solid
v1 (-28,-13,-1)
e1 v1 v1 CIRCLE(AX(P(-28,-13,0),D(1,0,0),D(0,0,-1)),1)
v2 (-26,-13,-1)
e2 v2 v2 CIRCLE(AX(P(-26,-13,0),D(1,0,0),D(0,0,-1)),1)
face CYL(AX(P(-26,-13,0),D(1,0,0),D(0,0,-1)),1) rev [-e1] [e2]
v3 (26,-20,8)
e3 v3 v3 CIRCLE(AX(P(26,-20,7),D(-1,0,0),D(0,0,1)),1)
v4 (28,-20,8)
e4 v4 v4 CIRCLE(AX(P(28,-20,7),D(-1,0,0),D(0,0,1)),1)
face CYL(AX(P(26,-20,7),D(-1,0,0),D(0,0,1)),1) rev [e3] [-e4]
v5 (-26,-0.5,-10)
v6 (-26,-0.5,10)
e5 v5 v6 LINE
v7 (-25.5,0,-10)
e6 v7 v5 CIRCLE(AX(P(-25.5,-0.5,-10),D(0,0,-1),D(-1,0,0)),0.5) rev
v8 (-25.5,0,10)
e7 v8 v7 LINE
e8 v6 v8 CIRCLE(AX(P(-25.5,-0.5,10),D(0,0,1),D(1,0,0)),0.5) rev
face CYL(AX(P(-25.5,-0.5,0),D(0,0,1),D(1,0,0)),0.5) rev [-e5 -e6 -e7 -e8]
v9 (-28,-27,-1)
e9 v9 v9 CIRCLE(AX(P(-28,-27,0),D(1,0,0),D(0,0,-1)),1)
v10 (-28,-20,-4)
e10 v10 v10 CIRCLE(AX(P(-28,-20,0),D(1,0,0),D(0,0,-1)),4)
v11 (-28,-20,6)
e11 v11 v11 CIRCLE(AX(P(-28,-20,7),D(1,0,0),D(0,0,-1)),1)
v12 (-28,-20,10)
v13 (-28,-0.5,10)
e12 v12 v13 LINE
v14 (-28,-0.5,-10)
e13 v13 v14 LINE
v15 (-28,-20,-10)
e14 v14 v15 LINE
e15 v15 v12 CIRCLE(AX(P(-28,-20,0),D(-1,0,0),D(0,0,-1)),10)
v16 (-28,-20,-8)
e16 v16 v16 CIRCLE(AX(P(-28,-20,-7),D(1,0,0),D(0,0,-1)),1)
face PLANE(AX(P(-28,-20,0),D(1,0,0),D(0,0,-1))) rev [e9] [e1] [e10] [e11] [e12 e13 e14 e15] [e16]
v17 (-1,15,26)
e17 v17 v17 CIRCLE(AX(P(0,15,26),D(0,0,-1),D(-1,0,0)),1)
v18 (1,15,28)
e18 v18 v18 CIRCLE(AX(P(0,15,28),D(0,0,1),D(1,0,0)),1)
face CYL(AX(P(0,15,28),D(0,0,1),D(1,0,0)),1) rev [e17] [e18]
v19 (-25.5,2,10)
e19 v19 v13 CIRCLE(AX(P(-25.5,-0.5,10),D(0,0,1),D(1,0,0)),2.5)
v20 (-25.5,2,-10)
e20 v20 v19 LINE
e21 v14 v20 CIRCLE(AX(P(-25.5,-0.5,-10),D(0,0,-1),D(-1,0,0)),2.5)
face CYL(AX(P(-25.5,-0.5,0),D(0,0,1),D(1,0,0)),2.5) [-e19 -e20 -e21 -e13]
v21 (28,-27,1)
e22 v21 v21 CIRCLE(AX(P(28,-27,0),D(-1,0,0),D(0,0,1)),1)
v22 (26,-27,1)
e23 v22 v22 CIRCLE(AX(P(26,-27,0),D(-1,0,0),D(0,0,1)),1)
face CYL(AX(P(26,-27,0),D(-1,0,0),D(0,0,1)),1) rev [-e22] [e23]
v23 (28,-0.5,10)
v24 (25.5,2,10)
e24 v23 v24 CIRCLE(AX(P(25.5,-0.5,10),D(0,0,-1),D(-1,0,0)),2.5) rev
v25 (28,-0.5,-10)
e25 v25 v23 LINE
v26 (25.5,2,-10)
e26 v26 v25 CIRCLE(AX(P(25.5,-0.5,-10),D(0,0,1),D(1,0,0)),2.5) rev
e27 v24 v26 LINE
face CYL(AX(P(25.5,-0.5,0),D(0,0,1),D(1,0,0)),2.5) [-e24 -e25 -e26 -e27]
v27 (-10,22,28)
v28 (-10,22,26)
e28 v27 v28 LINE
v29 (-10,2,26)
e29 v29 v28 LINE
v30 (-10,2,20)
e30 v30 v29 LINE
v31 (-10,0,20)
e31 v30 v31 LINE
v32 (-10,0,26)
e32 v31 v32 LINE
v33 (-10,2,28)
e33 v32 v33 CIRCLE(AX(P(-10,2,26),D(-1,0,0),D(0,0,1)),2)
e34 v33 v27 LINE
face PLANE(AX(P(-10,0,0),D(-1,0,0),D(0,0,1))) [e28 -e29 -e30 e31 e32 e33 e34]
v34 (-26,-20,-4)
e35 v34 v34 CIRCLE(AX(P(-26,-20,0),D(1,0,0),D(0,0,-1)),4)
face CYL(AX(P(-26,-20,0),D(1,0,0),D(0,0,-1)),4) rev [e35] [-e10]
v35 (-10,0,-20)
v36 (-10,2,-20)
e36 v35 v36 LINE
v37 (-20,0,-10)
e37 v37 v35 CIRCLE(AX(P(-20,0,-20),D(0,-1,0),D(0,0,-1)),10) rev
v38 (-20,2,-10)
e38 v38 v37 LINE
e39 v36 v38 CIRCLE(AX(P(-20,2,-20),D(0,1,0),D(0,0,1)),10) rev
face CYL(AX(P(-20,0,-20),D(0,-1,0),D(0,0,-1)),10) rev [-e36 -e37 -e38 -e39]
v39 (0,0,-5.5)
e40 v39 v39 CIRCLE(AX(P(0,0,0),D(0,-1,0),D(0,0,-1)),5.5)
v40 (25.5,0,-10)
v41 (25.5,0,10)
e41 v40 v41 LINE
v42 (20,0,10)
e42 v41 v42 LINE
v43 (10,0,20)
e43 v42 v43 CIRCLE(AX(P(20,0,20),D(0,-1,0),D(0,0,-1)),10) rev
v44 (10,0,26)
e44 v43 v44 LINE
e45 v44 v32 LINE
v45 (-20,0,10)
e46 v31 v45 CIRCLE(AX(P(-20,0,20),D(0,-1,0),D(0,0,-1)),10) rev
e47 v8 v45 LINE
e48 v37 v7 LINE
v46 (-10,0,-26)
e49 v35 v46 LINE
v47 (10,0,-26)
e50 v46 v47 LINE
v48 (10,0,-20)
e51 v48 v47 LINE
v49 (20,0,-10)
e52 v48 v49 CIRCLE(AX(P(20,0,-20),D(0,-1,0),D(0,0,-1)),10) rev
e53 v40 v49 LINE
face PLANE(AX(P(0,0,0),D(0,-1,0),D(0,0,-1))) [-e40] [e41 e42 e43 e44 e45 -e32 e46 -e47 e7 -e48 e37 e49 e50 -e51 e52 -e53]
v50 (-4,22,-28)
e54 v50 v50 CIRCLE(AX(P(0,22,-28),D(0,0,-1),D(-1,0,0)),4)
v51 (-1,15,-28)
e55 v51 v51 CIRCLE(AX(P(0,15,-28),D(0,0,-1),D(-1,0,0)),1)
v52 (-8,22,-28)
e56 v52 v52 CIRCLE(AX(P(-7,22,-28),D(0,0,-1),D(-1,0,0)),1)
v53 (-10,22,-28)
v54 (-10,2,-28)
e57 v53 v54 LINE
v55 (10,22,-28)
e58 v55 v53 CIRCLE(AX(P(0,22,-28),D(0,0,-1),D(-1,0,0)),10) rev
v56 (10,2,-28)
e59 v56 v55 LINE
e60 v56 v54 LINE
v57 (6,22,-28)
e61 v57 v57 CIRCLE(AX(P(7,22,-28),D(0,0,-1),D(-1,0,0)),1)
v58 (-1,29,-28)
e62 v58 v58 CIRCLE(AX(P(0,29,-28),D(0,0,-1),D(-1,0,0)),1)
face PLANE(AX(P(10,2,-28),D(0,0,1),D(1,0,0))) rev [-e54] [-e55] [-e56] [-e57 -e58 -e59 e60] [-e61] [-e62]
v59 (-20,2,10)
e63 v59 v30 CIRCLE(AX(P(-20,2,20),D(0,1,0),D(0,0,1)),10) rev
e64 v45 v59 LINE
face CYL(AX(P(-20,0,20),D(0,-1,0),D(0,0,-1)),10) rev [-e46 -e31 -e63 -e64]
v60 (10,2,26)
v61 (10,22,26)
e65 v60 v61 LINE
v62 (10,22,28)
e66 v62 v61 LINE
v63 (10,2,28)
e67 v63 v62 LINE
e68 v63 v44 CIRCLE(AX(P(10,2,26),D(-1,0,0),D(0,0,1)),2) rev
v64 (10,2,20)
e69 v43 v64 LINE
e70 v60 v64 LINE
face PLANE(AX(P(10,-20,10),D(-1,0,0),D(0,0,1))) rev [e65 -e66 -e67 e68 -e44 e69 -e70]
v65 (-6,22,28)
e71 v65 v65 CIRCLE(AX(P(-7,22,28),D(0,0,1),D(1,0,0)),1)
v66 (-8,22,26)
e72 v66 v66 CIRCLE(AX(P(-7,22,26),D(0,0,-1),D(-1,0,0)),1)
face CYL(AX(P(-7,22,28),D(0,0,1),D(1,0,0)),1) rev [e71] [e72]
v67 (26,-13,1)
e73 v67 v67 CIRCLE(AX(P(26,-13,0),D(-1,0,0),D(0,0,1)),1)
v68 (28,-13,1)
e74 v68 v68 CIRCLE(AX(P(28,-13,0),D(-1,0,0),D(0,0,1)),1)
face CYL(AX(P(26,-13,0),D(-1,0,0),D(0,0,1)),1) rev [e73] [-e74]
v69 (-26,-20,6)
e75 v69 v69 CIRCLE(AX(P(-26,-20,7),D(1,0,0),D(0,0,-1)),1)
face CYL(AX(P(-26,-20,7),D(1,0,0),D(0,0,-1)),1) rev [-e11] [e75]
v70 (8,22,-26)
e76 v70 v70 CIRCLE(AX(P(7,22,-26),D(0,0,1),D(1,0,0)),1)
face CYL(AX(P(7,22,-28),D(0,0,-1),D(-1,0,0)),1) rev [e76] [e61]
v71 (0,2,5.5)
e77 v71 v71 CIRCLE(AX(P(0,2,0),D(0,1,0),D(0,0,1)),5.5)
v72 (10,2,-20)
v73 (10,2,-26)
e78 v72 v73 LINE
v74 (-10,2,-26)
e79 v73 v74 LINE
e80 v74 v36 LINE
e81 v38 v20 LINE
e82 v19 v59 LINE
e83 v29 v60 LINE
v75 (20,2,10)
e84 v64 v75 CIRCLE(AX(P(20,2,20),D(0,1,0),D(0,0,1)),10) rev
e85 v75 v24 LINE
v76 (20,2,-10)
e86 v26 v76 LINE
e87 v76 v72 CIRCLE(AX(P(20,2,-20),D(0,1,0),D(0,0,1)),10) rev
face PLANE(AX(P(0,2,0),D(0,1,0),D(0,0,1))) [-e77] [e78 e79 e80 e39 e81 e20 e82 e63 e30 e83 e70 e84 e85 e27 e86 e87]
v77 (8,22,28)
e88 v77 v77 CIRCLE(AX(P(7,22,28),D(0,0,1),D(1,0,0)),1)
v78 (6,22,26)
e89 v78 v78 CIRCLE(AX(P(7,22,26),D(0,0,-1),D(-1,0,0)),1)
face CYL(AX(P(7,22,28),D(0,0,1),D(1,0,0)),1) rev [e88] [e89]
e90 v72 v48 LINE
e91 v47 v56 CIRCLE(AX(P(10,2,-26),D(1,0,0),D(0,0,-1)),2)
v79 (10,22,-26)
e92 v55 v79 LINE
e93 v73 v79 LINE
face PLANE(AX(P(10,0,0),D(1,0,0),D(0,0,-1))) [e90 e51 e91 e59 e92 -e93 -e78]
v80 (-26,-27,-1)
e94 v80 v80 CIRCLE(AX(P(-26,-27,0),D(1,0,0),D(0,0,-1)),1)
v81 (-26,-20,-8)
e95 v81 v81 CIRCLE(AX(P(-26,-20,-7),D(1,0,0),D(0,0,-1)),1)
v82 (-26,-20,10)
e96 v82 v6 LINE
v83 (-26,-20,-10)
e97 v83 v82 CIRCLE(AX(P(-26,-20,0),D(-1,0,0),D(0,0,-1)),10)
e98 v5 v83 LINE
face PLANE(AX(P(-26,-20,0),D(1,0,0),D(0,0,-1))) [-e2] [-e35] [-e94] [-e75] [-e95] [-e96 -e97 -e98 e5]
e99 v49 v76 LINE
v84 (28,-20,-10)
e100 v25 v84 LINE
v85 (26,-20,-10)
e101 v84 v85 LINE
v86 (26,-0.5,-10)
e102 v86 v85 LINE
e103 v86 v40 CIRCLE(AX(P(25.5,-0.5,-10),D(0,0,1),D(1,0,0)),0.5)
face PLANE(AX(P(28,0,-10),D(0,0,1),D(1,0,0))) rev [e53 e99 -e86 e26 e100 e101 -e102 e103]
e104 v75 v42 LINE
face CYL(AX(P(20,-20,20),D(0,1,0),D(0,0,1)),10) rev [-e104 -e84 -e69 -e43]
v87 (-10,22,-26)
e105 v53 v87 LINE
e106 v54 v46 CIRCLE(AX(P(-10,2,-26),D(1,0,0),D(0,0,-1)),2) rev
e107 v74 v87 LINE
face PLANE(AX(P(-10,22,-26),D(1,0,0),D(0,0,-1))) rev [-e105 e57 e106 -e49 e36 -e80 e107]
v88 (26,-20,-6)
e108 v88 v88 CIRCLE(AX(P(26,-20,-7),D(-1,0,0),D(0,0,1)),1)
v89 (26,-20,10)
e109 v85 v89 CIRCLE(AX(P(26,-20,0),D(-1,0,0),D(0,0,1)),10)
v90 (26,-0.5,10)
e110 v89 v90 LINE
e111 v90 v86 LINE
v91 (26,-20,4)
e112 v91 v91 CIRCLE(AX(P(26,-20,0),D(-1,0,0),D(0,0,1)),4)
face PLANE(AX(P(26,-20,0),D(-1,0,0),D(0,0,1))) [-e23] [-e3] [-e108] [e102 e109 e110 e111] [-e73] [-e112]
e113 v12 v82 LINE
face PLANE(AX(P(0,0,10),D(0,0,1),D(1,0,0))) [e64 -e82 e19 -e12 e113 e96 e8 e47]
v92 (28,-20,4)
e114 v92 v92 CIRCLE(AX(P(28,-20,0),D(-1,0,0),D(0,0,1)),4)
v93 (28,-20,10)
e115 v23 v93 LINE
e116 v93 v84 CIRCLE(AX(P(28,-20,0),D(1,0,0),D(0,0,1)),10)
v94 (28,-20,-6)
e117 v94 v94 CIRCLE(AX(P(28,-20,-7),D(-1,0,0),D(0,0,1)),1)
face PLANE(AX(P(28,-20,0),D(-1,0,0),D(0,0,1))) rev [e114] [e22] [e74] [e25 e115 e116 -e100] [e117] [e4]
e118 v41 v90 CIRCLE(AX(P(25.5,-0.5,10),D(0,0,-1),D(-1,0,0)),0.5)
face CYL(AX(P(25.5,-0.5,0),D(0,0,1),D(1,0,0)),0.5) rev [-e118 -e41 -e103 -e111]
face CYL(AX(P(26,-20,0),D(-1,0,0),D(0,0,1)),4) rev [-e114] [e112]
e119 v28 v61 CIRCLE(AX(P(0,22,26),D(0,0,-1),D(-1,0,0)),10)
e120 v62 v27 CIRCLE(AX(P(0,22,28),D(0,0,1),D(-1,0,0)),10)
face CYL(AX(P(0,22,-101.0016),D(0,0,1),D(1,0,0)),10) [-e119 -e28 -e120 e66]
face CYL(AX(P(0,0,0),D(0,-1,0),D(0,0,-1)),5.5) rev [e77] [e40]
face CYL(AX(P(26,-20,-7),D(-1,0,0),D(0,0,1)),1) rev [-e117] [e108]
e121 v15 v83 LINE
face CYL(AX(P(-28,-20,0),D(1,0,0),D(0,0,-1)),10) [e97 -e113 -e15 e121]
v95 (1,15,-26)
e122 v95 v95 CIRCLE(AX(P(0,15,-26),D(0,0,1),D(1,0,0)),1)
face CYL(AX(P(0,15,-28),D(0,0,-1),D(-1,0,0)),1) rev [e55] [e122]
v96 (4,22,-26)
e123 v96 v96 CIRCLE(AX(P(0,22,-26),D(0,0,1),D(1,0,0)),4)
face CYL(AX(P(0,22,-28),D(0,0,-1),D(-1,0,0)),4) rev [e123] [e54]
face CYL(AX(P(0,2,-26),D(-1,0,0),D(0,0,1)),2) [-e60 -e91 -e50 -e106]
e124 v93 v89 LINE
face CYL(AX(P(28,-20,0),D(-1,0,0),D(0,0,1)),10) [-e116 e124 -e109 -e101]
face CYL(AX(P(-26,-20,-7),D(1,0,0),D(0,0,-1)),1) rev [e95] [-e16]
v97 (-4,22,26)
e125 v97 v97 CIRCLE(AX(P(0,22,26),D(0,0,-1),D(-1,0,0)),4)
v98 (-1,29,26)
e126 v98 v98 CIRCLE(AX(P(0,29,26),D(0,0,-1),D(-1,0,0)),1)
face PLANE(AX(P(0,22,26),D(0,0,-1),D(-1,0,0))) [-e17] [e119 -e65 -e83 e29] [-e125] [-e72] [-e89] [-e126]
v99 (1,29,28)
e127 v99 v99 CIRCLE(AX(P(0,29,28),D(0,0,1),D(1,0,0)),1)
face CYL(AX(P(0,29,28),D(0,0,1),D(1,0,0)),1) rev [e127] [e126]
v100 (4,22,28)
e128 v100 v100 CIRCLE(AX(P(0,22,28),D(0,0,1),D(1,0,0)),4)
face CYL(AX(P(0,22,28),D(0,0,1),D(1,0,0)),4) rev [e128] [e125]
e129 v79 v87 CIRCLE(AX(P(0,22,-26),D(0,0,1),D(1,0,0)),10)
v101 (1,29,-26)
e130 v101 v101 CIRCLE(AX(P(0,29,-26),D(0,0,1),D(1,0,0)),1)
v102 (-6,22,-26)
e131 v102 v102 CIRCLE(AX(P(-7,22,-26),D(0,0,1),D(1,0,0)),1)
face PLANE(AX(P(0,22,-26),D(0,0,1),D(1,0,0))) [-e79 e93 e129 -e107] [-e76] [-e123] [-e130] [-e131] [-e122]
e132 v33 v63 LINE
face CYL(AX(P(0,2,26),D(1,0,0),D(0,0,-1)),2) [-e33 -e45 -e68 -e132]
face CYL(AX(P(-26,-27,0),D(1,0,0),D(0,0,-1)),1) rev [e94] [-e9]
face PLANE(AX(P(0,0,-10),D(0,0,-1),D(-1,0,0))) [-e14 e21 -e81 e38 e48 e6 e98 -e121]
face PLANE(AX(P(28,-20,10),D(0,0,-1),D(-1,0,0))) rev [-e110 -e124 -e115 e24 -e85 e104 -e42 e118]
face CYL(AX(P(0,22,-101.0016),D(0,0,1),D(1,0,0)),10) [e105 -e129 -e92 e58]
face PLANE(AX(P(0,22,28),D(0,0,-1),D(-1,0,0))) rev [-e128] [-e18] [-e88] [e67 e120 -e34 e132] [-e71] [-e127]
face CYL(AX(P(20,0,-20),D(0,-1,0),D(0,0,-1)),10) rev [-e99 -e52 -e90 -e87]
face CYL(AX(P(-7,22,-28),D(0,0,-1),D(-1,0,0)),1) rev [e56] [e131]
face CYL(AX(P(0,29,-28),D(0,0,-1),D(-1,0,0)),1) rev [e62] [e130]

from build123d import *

# Parameters (mm, degrees)
EXTRUDE_START               = -28
EXTRUDE_1_DEPTH             = 38
EXTRUDE_2_DEPTH             = 16
EXTRUDE_3_DEPTH             = 18
EXTRUDE_4_DEPTH             = 2
CUT_EXTRUDE_1_DEPTH         = 20
SKETCH_6_W                  = 16
SKETCH_6_H                  = 22
CUT_EXTRUDE_2_DEPTH         = 2
SKETCH_7_W                  = 2
SKETCH_7_H                  = 22
CUT_EXTRUDE_3_DEPTH         = 16
SKETCH_8_W                  = 16
SKETCH_8_H                  = 22
CUT_EXTRUDE_4_DEPTH         = 16
CUT_EXTRUDE_5_DEPTH         = 18
CUT_EXTRUDE_6_DEPTH         = 16
SKETCH_11_W                 = 16
SKETCH_11_H                 = 22
CUT_EXTRUDE_7_DEPTH         = 16
CUT_EXTRUDE_8_DEPTH         = 20
CUT_EXTRUDE_START           = -16
CUT_EXTRUDE_9_DEPTH         = 16
CUT_EXTRUDE_10_DEPTH        = 16
CUT_EXTRUDE_11_DEPTH        = 20
EXTRUDE_START_2             = 2
EXTRUDE_5_DEPTH             = 2
HOLE_WIZARD_11_0_11_1_D     = 11
HOLE_WIZARD_11_0_11_1_DEPTH = 32
HOLE_WIZARD_8_0_8_1_D       = 8
HOLE_WIZARD_8_0_8_1_DEPTH   = 2
HOLE_WIZARD_2_0_2_1_D       = 2
HOLE_WIZARD_2_0_2_1_DEPTH   = 2
HOLE_WIZARD_8_0_8_2_D       = 8
HOLE_WIZARD_8_0_8_2_DEPTH   = 56
HOLE_WIZARD_2_0_2_2_D       = 2
HOLE_WIZARD_2_0_2_2_DEPTH   = 56
HOLE_WIZARD_8_0_8_3_D       = 8
HOLE_WIZARD_8_0_8_3_DEPTH   = 2
HOLE_WIZARD_2_0_2_3_D       = 2
HOLE_WIZARD_2_0_2_3_DEPTH   = 2
HOLE_WIZARD_8_0_8_4_D       = 8
HOLE_WIZARD_2_0_2_4_D       = 2
FILLET_1_R                  = 0.5
FILLET_2_R                  = 2
FILLET_3_R                  = 2.5
FILLET_4_R                  = 10


with BuildPart() as part:
    # 凸台-拉伸1: read off the stored shape, not the designer's step
    # 凸台-拉伸1 outline → 凸台-拉伸1 (new body)
    with BuildSketch(Plane.XY.offset(EXTRUDE_START)):
        with BuildLine():
            Line((10, -20), (10, 22))
            ThreePointArc((10, 22), (0, 32), (-10, 22))
            Line((-10, 22), (-26, 22))
            Line((-26, 22), (-26, -20))
            Line((-26, -20), (10, -20))
        make_face()
    extrude(amount=EXTRUDE_1_DEPTH)

    # 草图2 → 凸台-拉伸2 (add)
    with BuildSketch(Plane.XY.offset(10)):
        with BuildLine():
            Line((10, 22), (10, -20))
            Line((10, -20), (-26, -20))
            Line((-26, -20), (-26, 22))
            Line((-26, 22), (-10, 22))
            ThreePointArc((-10, 22), (0, 32), (10, 22))
        make_face()
    extrude(amount=EXTRUDE_2_DEPTH)

    # 草图3 → 凸台-拉伸3 (add)
    with BuildSketch(Plane(origin=(10, 0, 0), x_dir=(0, 0, -1), z_dir=(1, 0, 0))):
        with BuildLine():
            Line((-10, -20), (-10, 22))
            Line((-10, 22), (10, 22))
            Line((10, 22), (26, 22))
            Line((26, 22), (28, 22))
            Line((28, 22), (28, -20))
            Line((28, -20), (10, -20))
            ThreePointArc((10, -20), (0, -30), (-10, -20))
        make_face()
    extrude(amount=EXTRUDE_3_DEPTH)

    # 草图4 → 凸台-拉伸4 (add)
    with BuildSketch(Plane.XY.offset(26)):
        with BuildLine():
            Line((10, 22), (10, -20))
            Line((10, -20), (-26, -20))
            Line((-26, -20), (-26, 22))
            Line((-26, 22), (-10, 22))
            ThreePointArc((-10, 22), (0, 32), (10, 22))
        make_face()
    extrude(amount=EXTRUDE_4_DEPTH)

    # 草图5 → 切除-拉伸1 (cut)
    with BuildSketch(Plane.XZ.offset(20)):
        Polygon((-26, 28), (-26, -28), (28, -28), (28, -10), (10, -10), (10, 10), (10, 28), align=None)
    extrude(amount=-CUT_EXTRUDE_1_DEPTH, mode=Mode.SUBTRACT)

    # 草图6 → 切除-拉伸2 (cut)
    with BuildSketch(Plane(origin=(0, 0, -28), x_dir=(-1, 0, 0), z_dir=(0, 0, -1))):
        with Locations((18, 11)):
            Rectangle(SKETCH_6_W, SKETCH_6_H)
    extrude(amount=-CUT_EXTRUDE_2_DEPTH, mode=Mode.SUBTRACT)

    # 草图7 → 切除-拉伸3 (cut)
    with BuildSketch(Plane.ZY.offset(26)):
        with Locations((27, 11)):
            Rectangle(SKETCH_7_W, SKETCH_7_H)
    extrude(amount=-CUT_EXTRUDE_3_DEPTH, mode=Mode.SUBTRACT)

    # 草图8 → 切除-拉伸4 (cut)
    with BuildSketch(Plane(origin=(0, 0, -26), x_dir=(-1, 0, 0), z_dir=(0, 0, -1))):
        with Locations((18, 11)):
            Rectangle(SKETCH_8_W, SKETCH_8_H)
    extrude(amount=-CUT_EXTRUDE_4_DEPTH, mode=Mode.SUBTRACT)

    # 草图9 → 切除-拉伸5 (cut)
    with BuildSketch(Plane(origin=(28, 0, 0), x_dir=(0, 0, -1), z_dir=(1, 0, 0))):
        Polygon((28, 22), (26, 22), (10, 22), (10, 0), (28, 0), align=None)
    extrude(amount=-CUT_EXTRUDE_5_DEPTH, mode=Mode.SUBTRACT)

    # 草图10 → 切除-拉伸6 (cut)
    with BuildSketch(Plane.ZY.offset(-10)):
        with BuildLine():
            Line((-10, 0), (-10, -20))
            ThreePointArc((-10, -20), (0, -30), (10, -20))
            Line((10, -20), (10, 0))
            Line((10, 0), (-10, 0))
        make_face()
    extrude(amount=-CUT_EXTRUDE_6_DEPTH, mode=Mode.SUBTRACT)

    # 草图11 → 切除-拉伸7 (cut)
    with BuildSketch(Plane.XY.offset(26)):
        with Locations((-18, 11)):
            Rectangle(SKETCH_11_W, SKETCH_11_H)
    extrude(amount=-CUT_EXTRUDE_7_DEPTH, mode=Mode.SUBTRACT)

    # 草图12 → 切除-拉伸8 (cut)
    with BuildSketch(Plane(origin=(0, 0, -10), x_dir=(-1, 0, 0), z_dir=(0, 0, -1))):
        with BuildLine():
            Line((-10, 22), (10, 22))
            ThreePointArc((10, 22), (0, 32), (-10, 22))
        make_face()
    extrude(amount=-CUT_EXTRUDE_8_DEPTH, mode=Mode.SUBTRACT)

    # 草图13 → 切除-拉伸9 (cut)
    with BuildSketch(Plane.XY.offset(-10).offset(CUT_EXTRUDE_START)):
        with BuildLine():
            Line((-10, 22), (10, 22))
            ThreePointArc((10, 22), (0, 32), (-10, 22))
        make_face()
    extrude(amount=CUT_EXTRUDE_9_DEPTH, mode=Mode.SUBTRACT)

    # 草图14 → 切除-拉伸10 (cut)
    with BuildSketch(Plane(origin=(0, 0, 10), x_dir=(-1, 0, 0), z_dir=(0, 0, -1))):
        with BuildLine():
            Line((-10, 22), (10, 22))
            ThreePointArc((10, 22), (0, 32), (-10, 22))
        make_face()
    extrude(amount=-CUT_EXTRUDE_10_DEPTH, mode=Mode.SUBTRACT)

    # 草图15 → 切除-拉伸11 (cut)
    with BuildSketch(Plane(origin=(0, 22, 0), x_dir=(-1, 0, 0), z_dir=(0, 1, 0))):
        Polygon((26, -10), (26, 10), (10, 10), (10, 26), (-10, 26), (-10, 10), (-28, 10), (-28, -10), (-10, -10), (-10, -26), (10, -26), (10, -10), align=None)
    extrude(amount=-CUT_EXTRUDE_11_DEPTH, mode=Mode.SUBTRACT)

    # 草图16 → 凸台-拉伸5 (add)
    with BuildSketch(Plane.ZY.offset(26).offset(EXTRUDE_START_2)):
        with BuildLine():
            Line((10, 2), (10, -20))
            ThreePointArc((10, -20), (0, -30), (-10, -20))
            Line((-10, -20), (-10, 2))
            Line((-10, 2), (10, 2))
        make_face()
    extrude(amount=-EXTRUDE_5_DEPTH)

    # Ø11.0 (11) 直径孔1
    with Locations(Plane(origin=(0, 0, 0), x_dir=(-1, 0, 0), z_dir=(0, -1, 0))):
        with Locations((0, 0)):
            Hole(HOLE_WIZARD_11_0_11_1_D / 2, depth=HOLE_WIZARD_11_0_11_1_DEPTH)

    # Ø8.0 (8) 直径孔1
    with Locations(Plane.XY.offset(28)):
        with Locations((0, 22)):
            Hole(HOLE_WIZARD_8_0_8_1_D / 2, depth=HOLE_WIZARD_8_0_8_1_DEPTH)

    # Ø2.0 (2) 直径孔1
    with Locations(Plane.XY.offset(28)):
        with Locations((0, 15), (7, 22), (-7, 22), (0, 29)):
            Hole(HOLE_WIZARD_2_0_2_1_D / 2, depth=HOLE_WIZARD_2_0_2_1_DEPTH)

    # Ø8.0 (8) 直径孔2
    with Locations(Plane(origin=(0, 0, -28), x_dir=(-1, 0, 0), z_dir=(0, 0, -1))):
        with Locations((0, 22)):
            Hole(HOLE_WIZARD_8_0_8_2_D / 2, depth=HOLE_WIZARD_8_0_8_2_DEPTH)

    # Ø2.0 (2) 直径孔2
    with Locations(Plane(origin=(0, 0, -28), x_dir=(-1, 0, 0), z_dir=(0, 0, -1))):
        with Locations((0, 15), (-7, 22), (7, 22), (0, 29)):
            Hole(HOLE_WIZARD_2_0_2_2_D / 2, depth=HOLE_WIZARD_2_0_2_2_DEPTH)

    # Ø8.0 (8) 直径孔3
    with Locations(Plane(origin=(-26, 0, 0), x_dir=(0, 0, -1), z_dir=(1, 0, 0))):
        with Locations((0, -20)):
            Hole(HOLE_WIZARD_8_0_8_3_D / 2, depth=HOLE_WIZARD_8_0_8_3_DEPTH)

    # Ø2.0 (2) 直径孔3
    with Locations(Plane(origin=(-26, 0, 0), x_dir=(0, 0, -1), z_dir=(1, 0, 0))):
        with Locations((0, -13), (0, -27), (7, -20), (-7, -20)):
            Hole(HOLE_WIZARD_2_0_2_3_D / 2, depth=HOLE_WIZARD_2_0_2_3_DEPTH)

    # Ø8.0 (8) 直径孔4 (through all)
    with Locations(Plane.ZY.offset(-26)):
        with Locations((0, -20)):
            Hole(HOLE_WIZARD_8_0_8_4_D / 2)

    # Ø2.0 (2) 直径孔4 (through all)
    with Locations(Plane.ZY.offset(-26)):
        with Locations((0, -13), (0, -27), (-7, -20), (7, -20)):
            Hole(HOLE_WIZARD_2_0_2_4_D / 2)

    # 圆角1
    fillet_1_edges = [part.edges().sort_by_distance(p)[0] for p in [
        (26, 0, 0),
        (-26, 0, 0),
    ]]
    fillet(fillet_1_edges, radius=FILLET_1_R)

    # 圆角2
    fillet_2_edges = [part.edges().sort_by_distance(p)[0] for p in [
        (0, 0, 28),
        (0, 0, -28),
    ]]
    fillet(fillet_2_edges, radius=FILLET_2_R)

    # 圆角3
    fillet_3_edges = [part.edges().sort_by_distance(p)[0] for p in [
        (28, 2, 0),
        (-28, 2, 0),
    ]]
    fillet(fillet_3_edges, radius=FILLET_3_R)

    # 圆角4
    fillet_4_edges = [part.edges().sort_by_distance(p)[0] for p in [
        (-10, 1, 10),
        (10, 1, -10),
        (-10, 1, -10),
        (10, 1, 10),
    ]]
    fillet(fillet_4_edges, radius=FILLET_4_R)


solid = part.part
